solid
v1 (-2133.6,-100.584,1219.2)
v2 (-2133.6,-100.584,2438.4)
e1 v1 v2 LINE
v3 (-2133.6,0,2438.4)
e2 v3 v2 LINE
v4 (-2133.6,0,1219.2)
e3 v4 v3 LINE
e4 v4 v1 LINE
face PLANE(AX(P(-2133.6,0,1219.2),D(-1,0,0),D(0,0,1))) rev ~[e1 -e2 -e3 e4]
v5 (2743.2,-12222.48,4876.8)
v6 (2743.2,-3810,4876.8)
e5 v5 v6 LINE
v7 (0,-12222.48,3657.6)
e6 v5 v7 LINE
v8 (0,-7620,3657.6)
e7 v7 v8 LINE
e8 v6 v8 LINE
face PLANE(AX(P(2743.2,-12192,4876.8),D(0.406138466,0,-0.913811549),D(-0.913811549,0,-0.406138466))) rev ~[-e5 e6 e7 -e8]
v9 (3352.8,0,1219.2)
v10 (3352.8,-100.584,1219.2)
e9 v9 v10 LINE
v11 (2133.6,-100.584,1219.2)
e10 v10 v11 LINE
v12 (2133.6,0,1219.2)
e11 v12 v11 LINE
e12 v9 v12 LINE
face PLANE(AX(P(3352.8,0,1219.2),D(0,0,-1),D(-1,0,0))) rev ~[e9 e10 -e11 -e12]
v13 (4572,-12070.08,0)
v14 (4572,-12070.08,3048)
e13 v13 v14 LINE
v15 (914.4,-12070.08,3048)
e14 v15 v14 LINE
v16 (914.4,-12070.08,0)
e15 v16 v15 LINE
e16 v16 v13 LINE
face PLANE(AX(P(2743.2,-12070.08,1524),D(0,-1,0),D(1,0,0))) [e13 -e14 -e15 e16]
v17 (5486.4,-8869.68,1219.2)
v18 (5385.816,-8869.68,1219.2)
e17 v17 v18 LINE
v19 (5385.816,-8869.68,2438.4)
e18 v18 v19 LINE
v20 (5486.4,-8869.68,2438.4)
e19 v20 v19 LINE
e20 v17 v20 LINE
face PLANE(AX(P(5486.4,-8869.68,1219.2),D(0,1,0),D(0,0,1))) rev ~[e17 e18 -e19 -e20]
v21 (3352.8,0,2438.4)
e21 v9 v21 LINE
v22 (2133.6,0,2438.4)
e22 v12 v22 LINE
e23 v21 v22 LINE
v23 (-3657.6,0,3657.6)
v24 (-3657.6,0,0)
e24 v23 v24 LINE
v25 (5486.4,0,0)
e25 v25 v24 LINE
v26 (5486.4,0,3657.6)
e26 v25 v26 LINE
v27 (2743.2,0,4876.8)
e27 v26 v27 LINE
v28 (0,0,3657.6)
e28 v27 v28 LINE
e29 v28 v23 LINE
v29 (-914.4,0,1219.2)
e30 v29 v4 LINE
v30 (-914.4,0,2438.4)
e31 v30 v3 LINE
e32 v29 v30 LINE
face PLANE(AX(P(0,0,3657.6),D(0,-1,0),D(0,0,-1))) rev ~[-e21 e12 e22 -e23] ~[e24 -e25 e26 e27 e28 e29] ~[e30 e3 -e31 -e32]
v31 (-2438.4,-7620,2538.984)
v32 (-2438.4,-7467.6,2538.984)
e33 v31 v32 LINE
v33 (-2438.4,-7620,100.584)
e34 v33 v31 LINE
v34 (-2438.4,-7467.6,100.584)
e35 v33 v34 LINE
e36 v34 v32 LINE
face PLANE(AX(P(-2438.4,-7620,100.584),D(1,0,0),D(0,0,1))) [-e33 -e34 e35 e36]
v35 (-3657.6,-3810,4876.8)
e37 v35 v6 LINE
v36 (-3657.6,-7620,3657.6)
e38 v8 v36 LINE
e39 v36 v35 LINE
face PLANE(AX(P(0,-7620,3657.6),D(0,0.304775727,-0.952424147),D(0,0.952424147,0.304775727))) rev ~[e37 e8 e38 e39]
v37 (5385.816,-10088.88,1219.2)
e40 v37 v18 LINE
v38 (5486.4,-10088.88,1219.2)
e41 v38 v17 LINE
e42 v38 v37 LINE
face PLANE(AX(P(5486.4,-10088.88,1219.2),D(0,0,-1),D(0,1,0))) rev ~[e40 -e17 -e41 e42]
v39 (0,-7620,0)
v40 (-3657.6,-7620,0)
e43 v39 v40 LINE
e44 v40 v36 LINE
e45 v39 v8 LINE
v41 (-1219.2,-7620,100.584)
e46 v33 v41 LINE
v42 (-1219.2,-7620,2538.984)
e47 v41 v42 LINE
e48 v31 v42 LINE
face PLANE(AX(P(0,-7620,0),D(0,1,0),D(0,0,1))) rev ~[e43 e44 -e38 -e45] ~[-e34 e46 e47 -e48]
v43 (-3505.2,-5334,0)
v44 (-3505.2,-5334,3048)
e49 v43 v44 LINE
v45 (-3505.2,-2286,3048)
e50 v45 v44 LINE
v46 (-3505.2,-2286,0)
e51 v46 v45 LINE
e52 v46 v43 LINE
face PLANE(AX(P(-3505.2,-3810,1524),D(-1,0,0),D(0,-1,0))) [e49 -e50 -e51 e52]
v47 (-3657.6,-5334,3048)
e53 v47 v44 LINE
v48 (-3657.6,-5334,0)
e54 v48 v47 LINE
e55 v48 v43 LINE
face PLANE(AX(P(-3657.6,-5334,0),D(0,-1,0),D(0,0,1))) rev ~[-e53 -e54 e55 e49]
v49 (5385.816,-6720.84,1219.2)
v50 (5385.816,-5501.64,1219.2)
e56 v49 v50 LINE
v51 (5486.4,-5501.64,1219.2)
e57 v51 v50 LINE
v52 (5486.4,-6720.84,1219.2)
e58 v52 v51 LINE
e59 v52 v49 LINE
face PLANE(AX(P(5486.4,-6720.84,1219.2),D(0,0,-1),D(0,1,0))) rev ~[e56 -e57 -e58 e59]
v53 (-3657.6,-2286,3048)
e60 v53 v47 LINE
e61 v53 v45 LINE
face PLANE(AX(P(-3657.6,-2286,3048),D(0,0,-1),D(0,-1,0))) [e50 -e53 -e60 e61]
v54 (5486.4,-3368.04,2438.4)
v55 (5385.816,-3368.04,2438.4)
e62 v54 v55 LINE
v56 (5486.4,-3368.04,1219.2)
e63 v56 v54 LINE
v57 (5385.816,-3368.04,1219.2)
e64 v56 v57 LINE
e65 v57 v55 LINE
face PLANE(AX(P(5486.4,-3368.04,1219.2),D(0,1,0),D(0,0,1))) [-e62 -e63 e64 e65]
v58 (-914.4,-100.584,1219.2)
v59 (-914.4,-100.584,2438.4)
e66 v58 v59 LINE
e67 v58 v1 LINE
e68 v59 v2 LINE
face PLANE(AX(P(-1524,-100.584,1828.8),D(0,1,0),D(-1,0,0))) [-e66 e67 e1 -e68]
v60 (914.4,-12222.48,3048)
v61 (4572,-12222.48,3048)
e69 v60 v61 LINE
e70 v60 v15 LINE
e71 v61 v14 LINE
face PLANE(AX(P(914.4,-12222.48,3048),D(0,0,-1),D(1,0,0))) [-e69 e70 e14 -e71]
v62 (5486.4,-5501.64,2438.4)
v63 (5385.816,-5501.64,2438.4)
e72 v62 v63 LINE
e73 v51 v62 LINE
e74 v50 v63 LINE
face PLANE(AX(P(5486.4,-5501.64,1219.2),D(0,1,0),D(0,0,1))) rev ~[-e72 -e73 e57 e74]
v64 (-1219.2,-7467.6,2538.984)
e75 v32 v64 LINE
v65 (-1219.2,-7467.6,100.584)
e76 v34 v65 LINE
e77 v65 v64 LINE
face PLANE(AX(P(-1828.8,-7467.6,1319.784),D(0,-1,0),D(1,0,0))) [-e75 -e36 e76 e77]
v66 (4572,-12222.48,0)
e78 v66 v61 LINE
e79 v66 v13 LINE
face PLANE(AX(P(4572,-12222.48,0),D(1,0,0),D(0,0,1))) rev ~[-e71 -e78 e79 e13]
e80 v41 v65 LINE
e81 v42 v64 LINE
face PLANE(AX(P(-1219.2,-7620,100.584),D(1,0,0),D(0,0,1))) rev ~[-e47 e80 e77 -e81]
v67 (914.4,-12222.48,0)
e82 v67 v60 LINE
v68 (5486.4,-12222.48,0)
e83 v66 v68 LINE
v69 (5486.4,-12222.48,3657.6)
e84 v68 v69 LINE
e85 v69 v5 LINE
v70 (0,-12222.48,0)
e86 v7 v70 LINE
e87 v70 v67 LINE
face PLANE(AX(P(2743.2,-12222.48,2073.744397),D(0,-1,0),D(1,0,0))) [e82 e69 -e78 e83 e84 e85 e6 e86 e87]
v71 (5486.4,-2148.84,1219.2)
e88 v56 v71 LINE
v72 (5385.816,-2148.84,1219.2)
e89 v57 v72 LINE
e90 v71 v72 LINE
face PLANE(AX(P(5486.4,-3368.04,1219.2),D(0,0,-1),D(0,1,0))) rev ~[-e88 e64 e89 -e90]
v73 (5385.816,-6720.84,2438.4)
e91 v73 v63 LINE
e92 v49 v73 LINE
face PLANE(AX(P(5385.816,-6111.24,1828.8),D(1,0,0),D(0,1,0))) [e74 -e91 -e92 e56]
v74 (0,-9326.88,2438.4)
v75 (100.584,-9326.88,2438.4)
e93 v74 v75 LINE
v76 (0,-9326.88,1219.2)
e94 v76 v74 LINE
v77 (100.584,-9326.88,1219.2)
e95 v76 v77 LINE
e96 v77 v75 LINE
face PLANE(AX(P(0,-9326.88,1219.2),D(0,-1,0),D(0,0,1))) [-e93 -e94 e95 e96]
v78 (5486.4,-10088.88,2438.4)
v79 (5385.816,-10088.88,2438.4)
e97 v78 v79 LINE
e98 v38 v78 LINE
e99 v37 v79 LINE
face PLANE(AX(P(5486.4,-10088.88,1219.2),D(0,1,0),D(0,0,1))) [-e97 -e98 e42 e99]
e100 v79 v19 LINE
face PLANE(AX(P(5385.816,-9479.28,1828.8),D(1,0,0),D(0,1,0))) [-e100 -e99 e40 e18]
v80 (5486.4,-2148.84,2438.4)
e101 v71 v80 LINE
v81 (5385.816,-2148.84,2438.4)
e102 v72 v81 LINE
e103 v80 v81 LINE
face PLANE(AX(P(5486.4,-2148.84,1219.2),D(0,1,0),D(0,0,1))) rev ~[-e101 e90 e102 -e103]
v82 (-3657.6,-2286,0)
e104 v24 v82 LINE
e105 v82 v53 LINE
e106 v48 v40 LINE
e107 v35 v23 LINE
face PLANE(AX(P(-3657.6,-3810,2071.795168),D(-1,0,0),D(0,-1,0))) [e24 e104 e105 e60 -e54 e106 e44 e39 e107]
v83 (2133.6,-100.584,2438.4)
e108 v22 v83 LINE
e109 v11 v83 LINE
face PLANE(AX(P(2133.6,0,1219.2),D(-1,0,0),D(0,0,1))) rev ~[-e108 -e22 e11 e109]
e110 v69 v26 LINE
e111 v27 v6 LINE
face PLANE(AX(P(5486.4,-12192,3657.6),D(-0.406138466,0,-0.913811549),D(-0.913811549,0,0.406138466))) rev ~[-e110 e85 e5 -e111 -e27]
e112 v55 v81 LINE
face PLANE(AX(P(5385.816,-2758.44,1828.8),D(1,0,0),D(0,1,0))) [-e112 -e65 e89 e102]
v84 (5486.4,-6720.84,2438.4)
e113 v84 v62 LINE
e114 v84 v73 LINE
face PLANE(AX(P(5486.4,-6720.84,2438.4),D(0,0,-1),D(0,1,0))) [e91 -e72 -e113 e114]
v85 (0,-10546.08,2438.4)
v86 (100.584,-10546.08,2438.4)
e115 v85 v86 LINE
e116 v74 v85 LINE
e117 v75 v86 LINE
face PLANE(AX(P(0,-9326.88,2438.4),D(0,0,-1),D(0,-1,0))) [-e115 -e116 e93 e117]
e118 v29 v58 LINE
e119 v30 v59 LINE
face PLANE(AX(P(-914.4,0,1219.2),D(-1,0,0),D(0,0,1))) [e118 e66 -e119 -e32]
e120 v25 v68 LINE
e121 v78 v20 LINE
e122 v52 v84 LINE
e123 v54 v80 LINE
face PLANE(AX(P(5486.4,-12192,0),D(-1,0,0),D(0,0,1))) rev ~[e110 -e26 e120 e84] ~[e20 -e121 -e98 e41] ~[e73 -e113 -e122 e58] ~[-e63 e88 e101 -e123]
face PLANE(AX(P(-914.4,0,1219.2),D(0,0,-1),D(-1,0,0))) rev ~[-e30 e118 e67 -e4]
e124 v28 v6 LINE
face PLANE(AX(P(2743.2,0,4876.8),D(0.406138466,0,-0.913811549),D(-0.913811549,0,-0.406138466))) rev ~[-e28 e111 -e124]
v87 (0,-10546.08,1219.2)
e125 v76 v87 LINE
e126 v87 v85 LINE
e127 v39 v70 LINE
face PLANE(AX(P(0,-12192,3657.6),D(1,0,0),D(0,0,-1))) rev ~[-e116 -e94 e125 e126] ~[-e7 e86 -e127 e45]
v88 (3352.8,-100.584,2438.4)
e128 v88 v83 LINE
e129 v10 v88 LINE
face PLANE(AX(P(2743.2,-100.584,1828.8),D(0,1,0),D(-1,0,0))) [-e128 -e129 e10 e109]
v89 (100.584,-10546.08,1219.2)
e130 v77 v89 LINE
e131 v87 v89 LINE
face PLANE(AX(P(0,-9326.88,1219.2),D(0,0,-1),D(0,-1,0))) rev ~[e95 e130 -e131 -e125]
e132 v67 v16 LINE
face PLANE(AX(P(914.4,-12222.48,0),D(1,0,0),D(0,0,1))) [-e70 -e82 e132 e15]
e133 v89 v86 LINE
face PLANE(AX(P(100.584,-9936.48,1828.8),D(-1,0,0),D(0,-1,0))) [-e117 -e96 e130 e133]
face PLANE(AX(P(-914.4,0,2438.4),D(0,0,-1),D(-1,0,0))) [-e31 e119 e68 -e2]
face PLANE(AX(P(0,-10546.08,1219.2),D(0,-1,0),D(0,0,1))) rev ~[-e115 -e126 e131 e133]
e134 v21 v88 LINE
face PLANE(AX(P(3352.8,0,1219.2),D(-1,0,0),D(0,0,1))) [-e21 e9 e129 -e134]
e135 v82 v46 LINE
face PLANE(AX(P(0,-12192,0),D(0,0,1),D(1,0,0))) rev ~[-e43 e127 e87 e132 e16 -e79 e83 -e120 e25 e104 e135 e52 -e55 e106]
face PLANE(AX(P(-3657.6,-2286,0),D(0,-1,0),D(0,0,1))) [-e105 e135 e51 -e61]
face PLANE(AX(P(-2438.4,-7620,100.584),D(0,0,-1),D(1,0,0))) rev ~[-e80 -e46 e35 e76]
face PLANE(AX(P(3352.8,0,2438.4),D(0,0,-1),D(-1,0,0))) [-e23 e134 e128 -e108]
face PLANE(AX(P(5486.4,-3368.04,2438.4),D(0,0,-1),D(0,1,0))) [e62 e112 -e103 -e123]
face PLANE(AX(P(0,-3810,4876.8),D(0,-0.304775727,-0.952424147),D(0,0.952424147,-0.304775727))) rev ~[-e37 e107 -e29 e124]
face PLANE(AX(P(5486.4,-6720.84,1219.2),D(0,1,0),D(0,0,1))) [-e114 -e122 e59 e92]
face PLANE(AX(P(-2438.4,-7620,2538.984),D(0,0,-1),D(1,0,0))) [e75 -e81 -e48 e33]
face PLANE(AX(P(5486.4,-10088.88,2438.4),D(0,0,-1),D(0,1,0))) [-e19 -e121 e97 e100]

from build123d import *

# Parameters (mm, degrees)
F1_DEPTH      = 12192
F3_DEPTH      = 3657.6
F3_DEPTH_BACK = 2743.2
F4_DEPTH      = 30.48
F5_W          = 3657.6
F5_H          = 3048
F6_DEPTH      = 152.4
F7_W          = 3048
F7_H          = 3048
F8_DEPTH      = 152.4
F9_W          = 1219.2
F9_H          = 2438.4
F10_DEPTH     = 152.4
F11_W         = 1219.2
F11_H         = 1219.2
F12_DEPTH     = 100.584
F13_W         = 1219.2
F13_H         = 1219.2
F14_DEPTH     = 100.584
F15_W         = 1219.2
F15_H         = 1219.2
F16_DEPTH     = 100.584


with BuildPart() as f1:
    # F0 (on Front) → F1 (new body)
    with BuildSketch(Plane.XZ):
        Polygon((0, 3657.6), (0, 0), (5486.4, 0), (5486.4, 3657.6), (2743.2, 4876.8), align=None)
    extrude(amount=F1_DEPTH)

    # F2 (on face) → F3 (join, two sides)
    with BuildSketch(Plane(origin=(0, 0, 0), x_dir=(0, -1, 0), z_dir=(-1, 0, 0))) as f3_sk:
        Polygon((0, 3657.6), (0, 0), (7620, 0), (7620, 3657.6), (3810, 4876.8), align=None)
    extrude(amount=F3_DEPTH)
    extrude(f3_sk.sketch, amount=-F3_DEPTH_BACK)

    # F4 (add): a face of the model
    f4_faces = [f1.faces().sort_by_distance(p)[0] for p in [
        (2743.2, -12192, 2148.1142857143),
    ]]
    extrude(f4_faces, amount=F4_DEPTH)

    # F5 (on face) → F6 (cut)
    with BuildSketch(Plane.XZ.offset(12222.48)):
        with Locations((2743.2, 1524)):
            Rectangle(F5_W, F5_H)
    extrude(amount=-F6_DEPTH, mode=Mode.SUBTRACT)

    # F7 (on face) → F8 (cut)
    with BuildSketch(Plane(origin=(-3657.6, 0, 0), x_dir=(0, -1, 0), z_dir=(-1, 0, 0))):
        with Locations((3810, 1524)):
            Rectangle(F7_W, F7_H)
    extrude(amount=-F8_DEPTH, mode=Mode.SUBTRACT)

    # F9 (on face) → F10 (cut)
    with BuildSketch(Plane.XZ.offset(7620)):
        with Locations((-1828.8, 1319.784)):
            Rectangle(F9_W, F9_H)
    extrude(amount=-F10_DEPTH, mode=Mode.SUBTRACT)

    # F11 (on face) → F12 (cut)
    with BuildSketch(Plane.YZ.offset(5486.4)):
        with Locations((-9479.28, 1828.8)):
            Rectangle(F11_W, F11_H)
        with Locations((-6111.24, 1828.8)):
            Rectangle(F11_W, F11_H)
        with Locations((-2758.44, 1828.8)):
            Rectangle(F11_W, F11_H)
    extrude(amount=-F12_DEPTH, mode=Mode.SUBTRACT)

    # F13 (on face) → F14 (cut)
    with BuildSketch(Plane(origin=(0, 0, 0), x_dir=(-1, 0, 0), z_dir=(0, 1, 0))):
        with Locations((-2743.2, 1828.8)):
            Rectangle(F13_W, F13_H)
        with Locations((1524, 1828.8)):
            Rectangle(F13_W, F13_H)
    extrude(amount=-F14_DEPTH, mode=Mode.SUBTRACT)

    # F15 (on face) → F16 (cut)
    with BuildSketch(Plane(origin=(0, 0, 0), x_dir=(0, -1, 0), z_dir=(-1, 0, 0))):
        with Locations((9936.48, 1828.8)):
            Rectangle(F15_W, F15_H)
    extrude(amount=-F16_DEPTH, mode=Mode.SUBTRACT)


solid = f1.part
